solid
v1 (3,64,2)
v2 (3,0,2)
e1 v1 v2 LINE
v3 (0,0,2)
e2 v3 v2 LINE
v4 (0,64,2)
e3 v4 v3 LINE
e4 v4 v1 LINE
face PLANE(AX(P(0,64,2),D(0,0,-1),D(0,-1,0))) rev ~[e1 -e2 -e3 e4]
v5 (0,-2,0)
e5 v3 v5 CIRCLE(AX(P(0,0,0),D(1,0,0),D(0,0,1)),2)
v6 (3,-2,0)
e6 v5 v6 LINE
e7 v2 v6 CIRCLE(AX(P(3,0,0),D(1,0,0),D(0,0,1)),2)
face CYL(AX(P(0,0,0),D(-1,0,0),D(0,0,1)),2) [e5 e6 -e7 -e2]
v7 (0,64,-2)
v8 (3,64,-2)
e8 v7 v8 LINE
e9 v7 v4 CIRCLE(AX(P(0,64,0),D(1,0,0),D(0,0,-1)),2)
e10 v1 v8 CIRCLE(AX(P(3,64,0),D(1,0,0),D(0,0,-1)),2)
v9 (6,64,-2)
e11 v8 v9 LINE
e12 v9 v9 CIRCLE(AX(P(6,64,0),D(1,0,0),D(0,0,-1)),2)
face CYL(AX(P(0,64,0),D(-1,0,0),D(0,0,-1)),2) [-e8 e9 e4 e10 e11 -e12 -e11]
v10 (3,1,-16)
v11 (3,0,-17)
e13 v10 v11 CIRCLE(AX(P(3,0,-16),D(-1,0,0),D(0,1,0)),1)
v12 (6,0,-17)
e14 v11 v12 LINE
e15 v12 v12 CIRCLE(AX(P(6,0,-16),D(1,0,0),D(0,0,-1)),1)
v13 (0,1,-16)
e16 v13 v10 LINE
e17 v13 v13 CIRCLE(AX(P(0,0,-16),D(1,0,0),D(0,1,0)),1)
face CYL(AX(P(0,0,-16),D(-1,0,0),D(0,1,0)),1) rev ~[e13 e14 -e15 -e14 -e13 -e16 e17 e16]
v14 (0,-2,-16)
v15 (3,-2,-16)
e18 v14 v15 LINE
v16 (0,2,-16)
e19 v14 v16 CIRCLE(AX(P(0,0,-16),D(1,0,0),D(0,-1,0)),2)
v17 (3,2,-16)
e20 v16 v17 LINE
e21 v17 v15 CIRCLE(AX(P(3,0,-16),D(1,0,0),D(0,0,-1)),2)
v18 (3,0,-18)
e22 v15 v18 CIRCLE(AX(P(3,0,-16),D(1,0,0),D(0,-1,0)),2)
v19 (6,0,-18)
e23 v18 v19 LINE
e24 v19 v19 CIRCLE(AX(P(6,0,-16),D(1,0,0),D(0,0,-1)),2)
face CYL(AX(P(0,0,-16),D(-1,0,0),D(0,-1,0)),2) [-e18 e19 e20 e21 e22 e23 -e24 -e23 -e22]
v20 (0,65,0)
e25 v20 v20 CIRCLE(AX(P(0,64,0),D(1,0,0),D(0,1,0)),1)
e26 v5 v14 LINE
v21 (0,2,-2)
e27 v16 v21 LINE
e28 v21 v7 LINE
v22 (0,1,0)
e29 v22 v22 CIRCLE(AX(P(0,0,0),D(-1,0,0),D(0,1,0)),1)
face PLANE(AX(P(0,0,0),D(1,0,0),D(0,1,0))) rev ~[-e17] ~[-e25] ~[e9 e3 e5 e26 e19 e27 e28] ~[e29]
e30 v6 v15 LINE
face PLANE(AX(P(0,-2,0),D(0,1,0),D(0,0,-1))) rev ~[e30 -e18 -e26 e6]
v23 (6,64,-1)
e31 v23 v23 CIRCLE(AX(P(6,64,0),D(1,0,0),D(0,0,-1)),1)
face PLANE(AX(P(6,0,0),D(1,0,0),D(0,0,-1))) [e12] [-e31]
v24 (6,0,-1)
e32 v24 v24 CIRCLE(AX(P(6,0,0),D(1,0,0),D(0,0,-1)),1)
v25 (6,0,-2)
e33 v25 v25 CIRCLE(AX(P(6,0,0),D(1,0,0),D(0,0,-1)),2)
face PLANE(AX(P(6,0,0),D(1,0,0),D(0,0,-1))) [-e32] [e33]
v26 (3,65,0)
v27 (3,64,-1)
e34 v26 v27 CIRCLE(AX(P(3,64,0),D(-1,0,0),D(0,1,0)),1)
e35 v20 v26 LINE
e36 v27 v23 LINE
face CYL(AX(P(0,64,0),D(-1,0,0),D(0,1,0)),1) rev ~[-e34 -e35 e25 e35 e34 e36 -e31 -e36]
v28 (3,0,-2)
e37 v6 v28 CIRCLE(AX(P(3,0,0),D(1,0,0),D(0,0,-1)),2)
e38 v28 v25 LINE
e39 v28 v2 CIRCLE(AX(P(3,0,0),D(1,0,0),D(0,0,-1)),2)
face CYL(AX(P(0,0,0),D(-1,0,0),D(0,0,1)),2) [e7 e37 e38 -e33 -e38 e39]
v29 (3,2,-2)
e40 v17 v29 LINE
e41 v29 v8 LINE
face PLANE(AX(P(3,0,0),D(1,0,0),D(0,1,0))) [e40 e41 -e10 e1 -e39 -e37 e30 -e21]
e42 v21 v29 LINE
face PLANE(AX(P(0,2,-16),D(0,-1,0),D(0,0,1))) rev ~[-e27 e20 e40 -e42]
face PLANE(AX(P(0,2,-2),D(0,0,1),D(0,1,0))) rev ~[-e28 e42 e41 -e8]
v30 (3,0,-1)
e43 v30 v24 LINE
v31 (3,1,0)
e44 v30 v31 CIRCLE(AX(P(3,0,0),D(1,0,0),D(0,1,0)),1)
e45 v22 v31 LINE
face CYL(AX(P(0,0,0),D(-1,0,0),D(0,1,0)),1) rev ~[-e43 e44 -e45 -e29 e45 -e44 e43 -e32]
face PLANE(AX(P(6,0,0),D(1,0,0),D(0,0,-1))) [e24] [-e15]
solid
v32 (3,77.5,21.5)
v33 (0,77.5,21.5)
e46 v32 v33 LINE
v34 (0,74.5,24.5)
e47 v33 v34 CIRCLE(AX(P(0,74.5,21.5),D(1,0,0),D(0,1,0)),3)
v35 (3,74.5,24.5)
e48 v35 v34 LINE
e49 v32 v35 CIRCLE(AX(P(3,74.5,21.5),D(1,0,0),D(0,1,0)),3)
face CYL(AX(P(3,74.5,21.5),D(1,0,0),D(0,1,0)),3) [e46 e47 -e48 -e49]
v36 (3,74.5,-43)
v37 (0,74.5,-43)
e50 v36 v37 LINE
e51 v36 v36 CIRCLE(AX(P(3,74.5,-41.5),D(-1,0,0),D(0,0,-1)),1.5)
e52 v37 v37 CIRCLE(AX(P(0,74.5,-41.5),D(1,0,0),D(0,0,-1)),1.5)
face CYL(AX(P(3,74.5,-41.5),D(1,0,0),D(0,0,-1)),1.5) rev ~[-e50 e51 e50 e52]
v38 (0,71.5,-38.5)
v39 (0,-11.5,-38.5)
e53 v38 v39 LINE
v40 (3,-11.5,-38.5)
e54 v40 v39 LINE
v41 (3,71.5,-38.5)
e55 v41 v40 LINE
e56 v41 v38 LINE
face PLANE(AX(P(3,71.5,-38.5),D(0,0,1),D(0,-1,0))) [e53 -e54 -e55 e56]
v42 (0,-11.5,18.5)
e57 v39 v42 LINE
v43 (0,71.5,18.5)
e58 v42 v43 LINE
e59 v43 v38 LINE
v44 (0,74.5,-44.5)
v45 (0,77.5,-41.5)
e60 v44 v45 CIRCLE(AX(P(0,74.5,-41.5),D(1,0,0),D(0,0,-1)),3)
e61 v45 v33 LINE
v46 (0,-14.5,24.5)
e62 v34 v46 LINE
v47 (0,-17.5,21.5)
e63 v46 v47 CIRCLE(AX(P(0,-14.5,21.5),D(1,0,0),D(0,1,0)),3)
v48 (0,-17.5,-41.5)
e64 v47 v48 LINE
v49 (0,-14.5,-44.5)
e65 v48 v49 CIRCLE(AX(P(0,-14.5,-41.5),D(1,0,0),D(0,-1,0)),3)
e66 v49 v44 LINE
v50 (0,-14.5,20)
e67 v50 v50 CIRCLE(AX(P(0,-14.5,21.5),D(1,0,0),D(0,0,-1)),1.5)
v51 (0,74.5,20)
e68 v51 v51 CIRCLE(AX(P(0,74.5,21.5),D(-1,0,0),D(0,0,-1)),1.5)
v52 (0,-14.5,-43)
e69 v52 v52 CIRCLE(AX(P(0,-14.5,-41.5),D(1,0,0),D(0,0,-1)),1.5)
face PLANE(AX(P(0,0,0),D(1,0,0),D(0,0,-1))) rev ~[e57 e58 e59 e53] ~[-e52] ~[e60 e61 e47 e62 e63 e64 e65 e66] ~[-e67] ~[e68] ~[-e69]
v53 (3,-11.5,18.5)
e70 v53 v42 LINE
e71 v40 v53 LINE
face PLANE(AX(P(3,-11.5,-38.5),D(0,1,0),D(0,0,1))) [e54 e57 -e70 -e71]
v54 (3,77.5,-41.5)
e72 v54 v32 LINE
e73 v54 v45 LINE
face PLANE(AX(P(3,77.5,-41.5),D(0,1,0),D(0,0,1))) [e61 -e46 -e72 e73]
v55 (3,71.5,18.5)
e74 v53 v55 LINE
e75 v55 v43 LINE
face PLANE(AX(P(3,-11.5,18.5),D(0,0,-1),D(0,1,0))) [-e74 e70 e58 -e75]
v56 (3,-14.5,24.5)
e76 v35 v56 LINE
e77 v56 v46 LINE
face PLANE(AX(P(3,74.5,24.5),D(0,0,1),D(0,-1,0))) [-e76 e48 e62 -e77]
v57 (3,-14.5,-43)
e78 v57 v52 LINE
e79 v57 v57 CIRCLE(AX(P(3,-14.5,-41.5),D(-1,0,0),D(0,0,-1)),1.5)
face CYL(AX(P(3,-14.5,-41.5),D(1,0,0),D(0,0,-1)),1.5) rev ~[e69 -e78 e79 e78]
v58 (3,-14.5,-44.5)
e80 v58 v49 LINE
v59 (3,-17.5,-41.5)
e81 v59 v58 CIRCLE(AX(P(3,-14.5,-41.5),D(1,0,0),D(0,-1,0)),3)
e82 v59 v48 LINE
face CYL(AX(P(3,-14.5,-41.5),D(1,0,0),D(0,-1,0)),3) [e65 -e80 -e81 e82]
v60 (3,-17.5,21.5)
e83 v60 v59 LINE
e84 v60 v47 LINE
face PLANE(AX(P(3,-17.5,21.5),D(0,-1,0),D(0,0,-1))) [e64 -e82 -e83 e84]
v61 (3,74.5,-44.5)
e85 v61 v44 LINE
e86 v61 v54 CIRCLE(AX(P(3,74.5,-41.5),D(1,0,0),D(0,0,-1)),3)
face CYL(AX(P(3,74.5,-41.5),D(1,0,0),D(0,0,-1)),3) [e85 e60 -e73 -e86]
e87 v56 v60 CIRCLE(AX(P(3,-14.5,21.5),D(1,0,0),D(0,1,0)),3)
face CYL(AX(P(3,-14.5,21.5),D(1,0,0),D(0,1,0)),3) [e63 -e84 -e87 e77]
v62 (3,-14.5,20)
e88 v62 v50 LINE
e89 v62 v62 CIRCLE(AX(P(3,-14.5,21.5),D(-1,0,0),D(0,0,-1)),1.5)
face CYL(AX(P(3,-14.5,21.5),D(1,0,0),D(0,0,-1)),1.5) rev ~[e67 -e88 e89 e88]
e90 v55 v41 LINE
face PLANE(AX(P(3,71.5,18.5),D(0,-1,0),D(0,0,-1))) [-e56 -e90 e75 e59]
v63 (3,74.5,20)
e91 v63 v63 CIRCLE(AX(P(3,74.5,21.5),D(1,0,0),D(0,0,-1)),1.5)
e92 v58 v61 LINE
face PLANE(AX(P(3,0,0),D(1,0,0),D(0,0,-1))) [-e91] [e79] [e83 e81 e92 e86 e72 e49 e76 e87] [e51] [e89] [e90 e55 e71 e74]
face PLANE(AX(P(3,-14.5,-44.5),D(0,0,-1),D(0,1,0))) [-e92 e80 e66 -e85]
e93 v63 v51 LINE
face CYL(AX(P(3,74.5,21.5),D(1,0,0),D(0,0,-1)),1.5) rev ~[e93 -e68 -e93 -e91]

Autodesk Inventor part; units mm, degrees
ref_plane "YZ Plane" through (0, 0, 0) normal (1, 0, 0) x (0, 1, 0)
ref_plane "XZ Plane" through (0, 0, 0) normal (0, 1, 0) x (-1, 0, 0)
ref_plane "XY Plane" through (0, 0, 0) normal (0, 0, 1) x (1, 0, 0)
sketch "Sketch1" plane through (0, 0, 0) normal (1, 0, 0) x (0, 1, 0)
  line L0 (0, 0) -> (0, -16)
  circle A0 centre (0, 0) radius 1
  circle A1 centre (0, -16) radius 1
  line L1 (0, 0) -> (64, 0)
  circle A2 centre (64, 0) radius 1
  line L2 (64, 0) -> (0, 0) construction
  line L3 (64, 2) -> (0, 2)
  line L4 (0, -2) -> (64, -2)
  arc A3 (64, -2) -> (64, 2) centre (64, 0) ccw
  arc A4 (0, 2) -> (0, -2) centre (0, 0) ccw
  line L5 (0, 0) -> (0, -16) construction
  line L6 (-2, 0) -> (-2, -16)
  line L7 (2, -16) -> (2, 0)
  arc A5 (2, 0) -> (-2, 0) centre (0, 0) ccw
  arc A6 (-2, -16) -> (2, -16) centre (0, -16) ccw
  point P0 (32, 0)
  point P1 (0, -8)
  point P2 (2, -2)
  dimension "d0" = 16
  dimension "d1" = 2
  dimension "d2" = 2
  dimension "d3" = 64
  dimension "d4" = 2
  dimension "d5" = 4
  dimension "d6" = 4
extrude "Extrusion1" add sketch "Sketch1" along normal blind 3 contours A0 L1 L7 L4 L0 | L0 A4 A5 L1 A0 | L4 L7 A6 L6 A4 | A5 L3 A3 L4 L7
sketch "Sketch2" plane through (3, 0, 0) normal (1, 0, 0) x (0, 0, -1)
  circle A0 centre (0, 64) radius 1 projected
  circle A1 centre (0, 64) radius 1
  circle A2 centre (0, 64) radius 2
  circle A3 centre (0, 0) radius 1
  circle A4 centre (0, 0) radius 2
  circle A5 centre (16, 0) radius 1 projected
  circle A6 centre (16, 0) radius 1
  circle A7 centre (16, 0) radius 2
  dimension "d9" = 2
  dimension "d10" = 4
  dimension "d11" = 2
  dimension "d12" = 4
extrude "Extrusion2" add sketch "Sketch2" along normal blind 3
sketch "Sketch3" plane through (3, 0, 0) normal (1, 0, 0) x (0, 0, -1)
  arc A0 (0, -2) -> (-2, 0) centre (0, 0) ccw projected
  line L0 (0, 0) -> (0, 30)
  line L1 (0, 30) -> (10, 30)
  line L2 (-21.5, 74.5) -> (41.5, 74.5)
  line L3 (41.5, 74.5) -> (41.5, -14.5)
  line L4 (41.5, -14.5) -> (-21.5, -14.5)
  line L5 (-21.5, -14.5) -> (-21.5, 74.5)
  line L6 (-21.5, 74.5) -> (41.5, -14.5) construction
  line L7 (41.5, 74.5) -> (-21.5, -14.5) construction
  circle A1 centre (-21.5, 74.5) radius 1.5
  circle A2 centre (41.5, 74.5) radius 1.5
  circle A3 centre (41.5, -14.5) radius 1.5
  circle A4 centre (-21.5, -14.5) radius 1.5
  line L8 (-21.5, -14.5) -> (41.5, -14.5) construction
  line L9 (-21.5, -17.5) -> (41.5, -17.5)
  line L10 (41.5, -11.5) -> (-21.5, -11.5)
  arc A5 (-21.5, -11.5) -> (-21.5, -17.5) centre (-21.5, -14.5) ccw
  arc A6 (41.5, -17.5) -> (41.5, -11.5) centre (41.5, -14.5) ccw
  line L11 (41.5, -14.5) -> (41.5, 74.5) construction
  line L12 (44.5, -14.5) -> (44.5, 74.5)
  line L13 (38.5, 74.5) -> (38.5, -14.5)
  arc A7 (38.5, -14.5) -> (44.5, -14.5) centre (41.5, -14.5) ccw
  arc A8 (44.5, 74.5) -> (38.5, 74.5) centre (41.5, 74.5) ccw
  line L14 (41.5, 74.5) -> (-21.5, 74.5) construction
  line L15 (41.5, 77.5) -> (-21.5, 77.5)
  line L16 (-21.5, 71.5) -> (41.5, 71.5)
  arc A9 (41.5, 71.5) -> (41.5, 77.5) centre (41.5, 74.5) ccw
  arc A10 (-21.5, 77.5) -> (-21.5, 71.5) centre (-21.5, 74.5) ccw
  line L17 (-21.5, 74.5) -> (-21.5, -14.5) construction
  line L18 (-24.5, 74.5) -> (-24.5, -14.5)
  line L19 (-18.5, -14.5) -> (-18.5, 74.5)
  arc A11 (-18.5, 74.5) -> (-24.5, 74.5) centre (-21.5, 74.5) ccw
  arc A12 (-24.5, -14.5) -> (-18.5, -14.5) centre (-21.5, -14.5) ccw
  point P0 (10, -14.5)
  point P1 (41.5, 30)
  point P2 (10, 74.5)
  point P3 (-21.5, 30)
  point P4 (-18.5, -11.5)
  point P5 (-18.5, 71.5)
  point P6 (38.5, 71.5)
  point P7 (38.5, -11.5)
  dimension "d15" = 30
  dimension "d16" = 10
  dimension "d17" = 63
  dimension "d18" = 89
  dimension "d19" = 3
  dimension "d20" = 3
  dimension "d21" = 3
  dimension "d22" = 3
  dimension "d23" = 6
  dimension "d24" = 6
  dimension "d25" = 6
  dimension "d26" = 6
extrude "Extrusion3" add sketch "Sketch3" against normal blind 3 contours A1 L5 A10 A11 L2 | L2 L19 L16 L5 A1 | A11 L15 A8 L2 | L2 L13 L16 L19 | L16 L19 L10 L5 | L5 A5 L18 A10 | A8 A9 L3 A2 L2 | L2 A2 L3 L16 L13 | L10 L19 L4 A4 L5 | L5 A4 L4 A12 A5 | L16 L3 L10 L13 | L10 L13 L4 L19 | L10 L3 A3 L4 L13 | A9 L12 A6 L3 | L4 A7 L9 A12 | A6 A7 L4 A3 L3
properties part number "servo_drever_support"
